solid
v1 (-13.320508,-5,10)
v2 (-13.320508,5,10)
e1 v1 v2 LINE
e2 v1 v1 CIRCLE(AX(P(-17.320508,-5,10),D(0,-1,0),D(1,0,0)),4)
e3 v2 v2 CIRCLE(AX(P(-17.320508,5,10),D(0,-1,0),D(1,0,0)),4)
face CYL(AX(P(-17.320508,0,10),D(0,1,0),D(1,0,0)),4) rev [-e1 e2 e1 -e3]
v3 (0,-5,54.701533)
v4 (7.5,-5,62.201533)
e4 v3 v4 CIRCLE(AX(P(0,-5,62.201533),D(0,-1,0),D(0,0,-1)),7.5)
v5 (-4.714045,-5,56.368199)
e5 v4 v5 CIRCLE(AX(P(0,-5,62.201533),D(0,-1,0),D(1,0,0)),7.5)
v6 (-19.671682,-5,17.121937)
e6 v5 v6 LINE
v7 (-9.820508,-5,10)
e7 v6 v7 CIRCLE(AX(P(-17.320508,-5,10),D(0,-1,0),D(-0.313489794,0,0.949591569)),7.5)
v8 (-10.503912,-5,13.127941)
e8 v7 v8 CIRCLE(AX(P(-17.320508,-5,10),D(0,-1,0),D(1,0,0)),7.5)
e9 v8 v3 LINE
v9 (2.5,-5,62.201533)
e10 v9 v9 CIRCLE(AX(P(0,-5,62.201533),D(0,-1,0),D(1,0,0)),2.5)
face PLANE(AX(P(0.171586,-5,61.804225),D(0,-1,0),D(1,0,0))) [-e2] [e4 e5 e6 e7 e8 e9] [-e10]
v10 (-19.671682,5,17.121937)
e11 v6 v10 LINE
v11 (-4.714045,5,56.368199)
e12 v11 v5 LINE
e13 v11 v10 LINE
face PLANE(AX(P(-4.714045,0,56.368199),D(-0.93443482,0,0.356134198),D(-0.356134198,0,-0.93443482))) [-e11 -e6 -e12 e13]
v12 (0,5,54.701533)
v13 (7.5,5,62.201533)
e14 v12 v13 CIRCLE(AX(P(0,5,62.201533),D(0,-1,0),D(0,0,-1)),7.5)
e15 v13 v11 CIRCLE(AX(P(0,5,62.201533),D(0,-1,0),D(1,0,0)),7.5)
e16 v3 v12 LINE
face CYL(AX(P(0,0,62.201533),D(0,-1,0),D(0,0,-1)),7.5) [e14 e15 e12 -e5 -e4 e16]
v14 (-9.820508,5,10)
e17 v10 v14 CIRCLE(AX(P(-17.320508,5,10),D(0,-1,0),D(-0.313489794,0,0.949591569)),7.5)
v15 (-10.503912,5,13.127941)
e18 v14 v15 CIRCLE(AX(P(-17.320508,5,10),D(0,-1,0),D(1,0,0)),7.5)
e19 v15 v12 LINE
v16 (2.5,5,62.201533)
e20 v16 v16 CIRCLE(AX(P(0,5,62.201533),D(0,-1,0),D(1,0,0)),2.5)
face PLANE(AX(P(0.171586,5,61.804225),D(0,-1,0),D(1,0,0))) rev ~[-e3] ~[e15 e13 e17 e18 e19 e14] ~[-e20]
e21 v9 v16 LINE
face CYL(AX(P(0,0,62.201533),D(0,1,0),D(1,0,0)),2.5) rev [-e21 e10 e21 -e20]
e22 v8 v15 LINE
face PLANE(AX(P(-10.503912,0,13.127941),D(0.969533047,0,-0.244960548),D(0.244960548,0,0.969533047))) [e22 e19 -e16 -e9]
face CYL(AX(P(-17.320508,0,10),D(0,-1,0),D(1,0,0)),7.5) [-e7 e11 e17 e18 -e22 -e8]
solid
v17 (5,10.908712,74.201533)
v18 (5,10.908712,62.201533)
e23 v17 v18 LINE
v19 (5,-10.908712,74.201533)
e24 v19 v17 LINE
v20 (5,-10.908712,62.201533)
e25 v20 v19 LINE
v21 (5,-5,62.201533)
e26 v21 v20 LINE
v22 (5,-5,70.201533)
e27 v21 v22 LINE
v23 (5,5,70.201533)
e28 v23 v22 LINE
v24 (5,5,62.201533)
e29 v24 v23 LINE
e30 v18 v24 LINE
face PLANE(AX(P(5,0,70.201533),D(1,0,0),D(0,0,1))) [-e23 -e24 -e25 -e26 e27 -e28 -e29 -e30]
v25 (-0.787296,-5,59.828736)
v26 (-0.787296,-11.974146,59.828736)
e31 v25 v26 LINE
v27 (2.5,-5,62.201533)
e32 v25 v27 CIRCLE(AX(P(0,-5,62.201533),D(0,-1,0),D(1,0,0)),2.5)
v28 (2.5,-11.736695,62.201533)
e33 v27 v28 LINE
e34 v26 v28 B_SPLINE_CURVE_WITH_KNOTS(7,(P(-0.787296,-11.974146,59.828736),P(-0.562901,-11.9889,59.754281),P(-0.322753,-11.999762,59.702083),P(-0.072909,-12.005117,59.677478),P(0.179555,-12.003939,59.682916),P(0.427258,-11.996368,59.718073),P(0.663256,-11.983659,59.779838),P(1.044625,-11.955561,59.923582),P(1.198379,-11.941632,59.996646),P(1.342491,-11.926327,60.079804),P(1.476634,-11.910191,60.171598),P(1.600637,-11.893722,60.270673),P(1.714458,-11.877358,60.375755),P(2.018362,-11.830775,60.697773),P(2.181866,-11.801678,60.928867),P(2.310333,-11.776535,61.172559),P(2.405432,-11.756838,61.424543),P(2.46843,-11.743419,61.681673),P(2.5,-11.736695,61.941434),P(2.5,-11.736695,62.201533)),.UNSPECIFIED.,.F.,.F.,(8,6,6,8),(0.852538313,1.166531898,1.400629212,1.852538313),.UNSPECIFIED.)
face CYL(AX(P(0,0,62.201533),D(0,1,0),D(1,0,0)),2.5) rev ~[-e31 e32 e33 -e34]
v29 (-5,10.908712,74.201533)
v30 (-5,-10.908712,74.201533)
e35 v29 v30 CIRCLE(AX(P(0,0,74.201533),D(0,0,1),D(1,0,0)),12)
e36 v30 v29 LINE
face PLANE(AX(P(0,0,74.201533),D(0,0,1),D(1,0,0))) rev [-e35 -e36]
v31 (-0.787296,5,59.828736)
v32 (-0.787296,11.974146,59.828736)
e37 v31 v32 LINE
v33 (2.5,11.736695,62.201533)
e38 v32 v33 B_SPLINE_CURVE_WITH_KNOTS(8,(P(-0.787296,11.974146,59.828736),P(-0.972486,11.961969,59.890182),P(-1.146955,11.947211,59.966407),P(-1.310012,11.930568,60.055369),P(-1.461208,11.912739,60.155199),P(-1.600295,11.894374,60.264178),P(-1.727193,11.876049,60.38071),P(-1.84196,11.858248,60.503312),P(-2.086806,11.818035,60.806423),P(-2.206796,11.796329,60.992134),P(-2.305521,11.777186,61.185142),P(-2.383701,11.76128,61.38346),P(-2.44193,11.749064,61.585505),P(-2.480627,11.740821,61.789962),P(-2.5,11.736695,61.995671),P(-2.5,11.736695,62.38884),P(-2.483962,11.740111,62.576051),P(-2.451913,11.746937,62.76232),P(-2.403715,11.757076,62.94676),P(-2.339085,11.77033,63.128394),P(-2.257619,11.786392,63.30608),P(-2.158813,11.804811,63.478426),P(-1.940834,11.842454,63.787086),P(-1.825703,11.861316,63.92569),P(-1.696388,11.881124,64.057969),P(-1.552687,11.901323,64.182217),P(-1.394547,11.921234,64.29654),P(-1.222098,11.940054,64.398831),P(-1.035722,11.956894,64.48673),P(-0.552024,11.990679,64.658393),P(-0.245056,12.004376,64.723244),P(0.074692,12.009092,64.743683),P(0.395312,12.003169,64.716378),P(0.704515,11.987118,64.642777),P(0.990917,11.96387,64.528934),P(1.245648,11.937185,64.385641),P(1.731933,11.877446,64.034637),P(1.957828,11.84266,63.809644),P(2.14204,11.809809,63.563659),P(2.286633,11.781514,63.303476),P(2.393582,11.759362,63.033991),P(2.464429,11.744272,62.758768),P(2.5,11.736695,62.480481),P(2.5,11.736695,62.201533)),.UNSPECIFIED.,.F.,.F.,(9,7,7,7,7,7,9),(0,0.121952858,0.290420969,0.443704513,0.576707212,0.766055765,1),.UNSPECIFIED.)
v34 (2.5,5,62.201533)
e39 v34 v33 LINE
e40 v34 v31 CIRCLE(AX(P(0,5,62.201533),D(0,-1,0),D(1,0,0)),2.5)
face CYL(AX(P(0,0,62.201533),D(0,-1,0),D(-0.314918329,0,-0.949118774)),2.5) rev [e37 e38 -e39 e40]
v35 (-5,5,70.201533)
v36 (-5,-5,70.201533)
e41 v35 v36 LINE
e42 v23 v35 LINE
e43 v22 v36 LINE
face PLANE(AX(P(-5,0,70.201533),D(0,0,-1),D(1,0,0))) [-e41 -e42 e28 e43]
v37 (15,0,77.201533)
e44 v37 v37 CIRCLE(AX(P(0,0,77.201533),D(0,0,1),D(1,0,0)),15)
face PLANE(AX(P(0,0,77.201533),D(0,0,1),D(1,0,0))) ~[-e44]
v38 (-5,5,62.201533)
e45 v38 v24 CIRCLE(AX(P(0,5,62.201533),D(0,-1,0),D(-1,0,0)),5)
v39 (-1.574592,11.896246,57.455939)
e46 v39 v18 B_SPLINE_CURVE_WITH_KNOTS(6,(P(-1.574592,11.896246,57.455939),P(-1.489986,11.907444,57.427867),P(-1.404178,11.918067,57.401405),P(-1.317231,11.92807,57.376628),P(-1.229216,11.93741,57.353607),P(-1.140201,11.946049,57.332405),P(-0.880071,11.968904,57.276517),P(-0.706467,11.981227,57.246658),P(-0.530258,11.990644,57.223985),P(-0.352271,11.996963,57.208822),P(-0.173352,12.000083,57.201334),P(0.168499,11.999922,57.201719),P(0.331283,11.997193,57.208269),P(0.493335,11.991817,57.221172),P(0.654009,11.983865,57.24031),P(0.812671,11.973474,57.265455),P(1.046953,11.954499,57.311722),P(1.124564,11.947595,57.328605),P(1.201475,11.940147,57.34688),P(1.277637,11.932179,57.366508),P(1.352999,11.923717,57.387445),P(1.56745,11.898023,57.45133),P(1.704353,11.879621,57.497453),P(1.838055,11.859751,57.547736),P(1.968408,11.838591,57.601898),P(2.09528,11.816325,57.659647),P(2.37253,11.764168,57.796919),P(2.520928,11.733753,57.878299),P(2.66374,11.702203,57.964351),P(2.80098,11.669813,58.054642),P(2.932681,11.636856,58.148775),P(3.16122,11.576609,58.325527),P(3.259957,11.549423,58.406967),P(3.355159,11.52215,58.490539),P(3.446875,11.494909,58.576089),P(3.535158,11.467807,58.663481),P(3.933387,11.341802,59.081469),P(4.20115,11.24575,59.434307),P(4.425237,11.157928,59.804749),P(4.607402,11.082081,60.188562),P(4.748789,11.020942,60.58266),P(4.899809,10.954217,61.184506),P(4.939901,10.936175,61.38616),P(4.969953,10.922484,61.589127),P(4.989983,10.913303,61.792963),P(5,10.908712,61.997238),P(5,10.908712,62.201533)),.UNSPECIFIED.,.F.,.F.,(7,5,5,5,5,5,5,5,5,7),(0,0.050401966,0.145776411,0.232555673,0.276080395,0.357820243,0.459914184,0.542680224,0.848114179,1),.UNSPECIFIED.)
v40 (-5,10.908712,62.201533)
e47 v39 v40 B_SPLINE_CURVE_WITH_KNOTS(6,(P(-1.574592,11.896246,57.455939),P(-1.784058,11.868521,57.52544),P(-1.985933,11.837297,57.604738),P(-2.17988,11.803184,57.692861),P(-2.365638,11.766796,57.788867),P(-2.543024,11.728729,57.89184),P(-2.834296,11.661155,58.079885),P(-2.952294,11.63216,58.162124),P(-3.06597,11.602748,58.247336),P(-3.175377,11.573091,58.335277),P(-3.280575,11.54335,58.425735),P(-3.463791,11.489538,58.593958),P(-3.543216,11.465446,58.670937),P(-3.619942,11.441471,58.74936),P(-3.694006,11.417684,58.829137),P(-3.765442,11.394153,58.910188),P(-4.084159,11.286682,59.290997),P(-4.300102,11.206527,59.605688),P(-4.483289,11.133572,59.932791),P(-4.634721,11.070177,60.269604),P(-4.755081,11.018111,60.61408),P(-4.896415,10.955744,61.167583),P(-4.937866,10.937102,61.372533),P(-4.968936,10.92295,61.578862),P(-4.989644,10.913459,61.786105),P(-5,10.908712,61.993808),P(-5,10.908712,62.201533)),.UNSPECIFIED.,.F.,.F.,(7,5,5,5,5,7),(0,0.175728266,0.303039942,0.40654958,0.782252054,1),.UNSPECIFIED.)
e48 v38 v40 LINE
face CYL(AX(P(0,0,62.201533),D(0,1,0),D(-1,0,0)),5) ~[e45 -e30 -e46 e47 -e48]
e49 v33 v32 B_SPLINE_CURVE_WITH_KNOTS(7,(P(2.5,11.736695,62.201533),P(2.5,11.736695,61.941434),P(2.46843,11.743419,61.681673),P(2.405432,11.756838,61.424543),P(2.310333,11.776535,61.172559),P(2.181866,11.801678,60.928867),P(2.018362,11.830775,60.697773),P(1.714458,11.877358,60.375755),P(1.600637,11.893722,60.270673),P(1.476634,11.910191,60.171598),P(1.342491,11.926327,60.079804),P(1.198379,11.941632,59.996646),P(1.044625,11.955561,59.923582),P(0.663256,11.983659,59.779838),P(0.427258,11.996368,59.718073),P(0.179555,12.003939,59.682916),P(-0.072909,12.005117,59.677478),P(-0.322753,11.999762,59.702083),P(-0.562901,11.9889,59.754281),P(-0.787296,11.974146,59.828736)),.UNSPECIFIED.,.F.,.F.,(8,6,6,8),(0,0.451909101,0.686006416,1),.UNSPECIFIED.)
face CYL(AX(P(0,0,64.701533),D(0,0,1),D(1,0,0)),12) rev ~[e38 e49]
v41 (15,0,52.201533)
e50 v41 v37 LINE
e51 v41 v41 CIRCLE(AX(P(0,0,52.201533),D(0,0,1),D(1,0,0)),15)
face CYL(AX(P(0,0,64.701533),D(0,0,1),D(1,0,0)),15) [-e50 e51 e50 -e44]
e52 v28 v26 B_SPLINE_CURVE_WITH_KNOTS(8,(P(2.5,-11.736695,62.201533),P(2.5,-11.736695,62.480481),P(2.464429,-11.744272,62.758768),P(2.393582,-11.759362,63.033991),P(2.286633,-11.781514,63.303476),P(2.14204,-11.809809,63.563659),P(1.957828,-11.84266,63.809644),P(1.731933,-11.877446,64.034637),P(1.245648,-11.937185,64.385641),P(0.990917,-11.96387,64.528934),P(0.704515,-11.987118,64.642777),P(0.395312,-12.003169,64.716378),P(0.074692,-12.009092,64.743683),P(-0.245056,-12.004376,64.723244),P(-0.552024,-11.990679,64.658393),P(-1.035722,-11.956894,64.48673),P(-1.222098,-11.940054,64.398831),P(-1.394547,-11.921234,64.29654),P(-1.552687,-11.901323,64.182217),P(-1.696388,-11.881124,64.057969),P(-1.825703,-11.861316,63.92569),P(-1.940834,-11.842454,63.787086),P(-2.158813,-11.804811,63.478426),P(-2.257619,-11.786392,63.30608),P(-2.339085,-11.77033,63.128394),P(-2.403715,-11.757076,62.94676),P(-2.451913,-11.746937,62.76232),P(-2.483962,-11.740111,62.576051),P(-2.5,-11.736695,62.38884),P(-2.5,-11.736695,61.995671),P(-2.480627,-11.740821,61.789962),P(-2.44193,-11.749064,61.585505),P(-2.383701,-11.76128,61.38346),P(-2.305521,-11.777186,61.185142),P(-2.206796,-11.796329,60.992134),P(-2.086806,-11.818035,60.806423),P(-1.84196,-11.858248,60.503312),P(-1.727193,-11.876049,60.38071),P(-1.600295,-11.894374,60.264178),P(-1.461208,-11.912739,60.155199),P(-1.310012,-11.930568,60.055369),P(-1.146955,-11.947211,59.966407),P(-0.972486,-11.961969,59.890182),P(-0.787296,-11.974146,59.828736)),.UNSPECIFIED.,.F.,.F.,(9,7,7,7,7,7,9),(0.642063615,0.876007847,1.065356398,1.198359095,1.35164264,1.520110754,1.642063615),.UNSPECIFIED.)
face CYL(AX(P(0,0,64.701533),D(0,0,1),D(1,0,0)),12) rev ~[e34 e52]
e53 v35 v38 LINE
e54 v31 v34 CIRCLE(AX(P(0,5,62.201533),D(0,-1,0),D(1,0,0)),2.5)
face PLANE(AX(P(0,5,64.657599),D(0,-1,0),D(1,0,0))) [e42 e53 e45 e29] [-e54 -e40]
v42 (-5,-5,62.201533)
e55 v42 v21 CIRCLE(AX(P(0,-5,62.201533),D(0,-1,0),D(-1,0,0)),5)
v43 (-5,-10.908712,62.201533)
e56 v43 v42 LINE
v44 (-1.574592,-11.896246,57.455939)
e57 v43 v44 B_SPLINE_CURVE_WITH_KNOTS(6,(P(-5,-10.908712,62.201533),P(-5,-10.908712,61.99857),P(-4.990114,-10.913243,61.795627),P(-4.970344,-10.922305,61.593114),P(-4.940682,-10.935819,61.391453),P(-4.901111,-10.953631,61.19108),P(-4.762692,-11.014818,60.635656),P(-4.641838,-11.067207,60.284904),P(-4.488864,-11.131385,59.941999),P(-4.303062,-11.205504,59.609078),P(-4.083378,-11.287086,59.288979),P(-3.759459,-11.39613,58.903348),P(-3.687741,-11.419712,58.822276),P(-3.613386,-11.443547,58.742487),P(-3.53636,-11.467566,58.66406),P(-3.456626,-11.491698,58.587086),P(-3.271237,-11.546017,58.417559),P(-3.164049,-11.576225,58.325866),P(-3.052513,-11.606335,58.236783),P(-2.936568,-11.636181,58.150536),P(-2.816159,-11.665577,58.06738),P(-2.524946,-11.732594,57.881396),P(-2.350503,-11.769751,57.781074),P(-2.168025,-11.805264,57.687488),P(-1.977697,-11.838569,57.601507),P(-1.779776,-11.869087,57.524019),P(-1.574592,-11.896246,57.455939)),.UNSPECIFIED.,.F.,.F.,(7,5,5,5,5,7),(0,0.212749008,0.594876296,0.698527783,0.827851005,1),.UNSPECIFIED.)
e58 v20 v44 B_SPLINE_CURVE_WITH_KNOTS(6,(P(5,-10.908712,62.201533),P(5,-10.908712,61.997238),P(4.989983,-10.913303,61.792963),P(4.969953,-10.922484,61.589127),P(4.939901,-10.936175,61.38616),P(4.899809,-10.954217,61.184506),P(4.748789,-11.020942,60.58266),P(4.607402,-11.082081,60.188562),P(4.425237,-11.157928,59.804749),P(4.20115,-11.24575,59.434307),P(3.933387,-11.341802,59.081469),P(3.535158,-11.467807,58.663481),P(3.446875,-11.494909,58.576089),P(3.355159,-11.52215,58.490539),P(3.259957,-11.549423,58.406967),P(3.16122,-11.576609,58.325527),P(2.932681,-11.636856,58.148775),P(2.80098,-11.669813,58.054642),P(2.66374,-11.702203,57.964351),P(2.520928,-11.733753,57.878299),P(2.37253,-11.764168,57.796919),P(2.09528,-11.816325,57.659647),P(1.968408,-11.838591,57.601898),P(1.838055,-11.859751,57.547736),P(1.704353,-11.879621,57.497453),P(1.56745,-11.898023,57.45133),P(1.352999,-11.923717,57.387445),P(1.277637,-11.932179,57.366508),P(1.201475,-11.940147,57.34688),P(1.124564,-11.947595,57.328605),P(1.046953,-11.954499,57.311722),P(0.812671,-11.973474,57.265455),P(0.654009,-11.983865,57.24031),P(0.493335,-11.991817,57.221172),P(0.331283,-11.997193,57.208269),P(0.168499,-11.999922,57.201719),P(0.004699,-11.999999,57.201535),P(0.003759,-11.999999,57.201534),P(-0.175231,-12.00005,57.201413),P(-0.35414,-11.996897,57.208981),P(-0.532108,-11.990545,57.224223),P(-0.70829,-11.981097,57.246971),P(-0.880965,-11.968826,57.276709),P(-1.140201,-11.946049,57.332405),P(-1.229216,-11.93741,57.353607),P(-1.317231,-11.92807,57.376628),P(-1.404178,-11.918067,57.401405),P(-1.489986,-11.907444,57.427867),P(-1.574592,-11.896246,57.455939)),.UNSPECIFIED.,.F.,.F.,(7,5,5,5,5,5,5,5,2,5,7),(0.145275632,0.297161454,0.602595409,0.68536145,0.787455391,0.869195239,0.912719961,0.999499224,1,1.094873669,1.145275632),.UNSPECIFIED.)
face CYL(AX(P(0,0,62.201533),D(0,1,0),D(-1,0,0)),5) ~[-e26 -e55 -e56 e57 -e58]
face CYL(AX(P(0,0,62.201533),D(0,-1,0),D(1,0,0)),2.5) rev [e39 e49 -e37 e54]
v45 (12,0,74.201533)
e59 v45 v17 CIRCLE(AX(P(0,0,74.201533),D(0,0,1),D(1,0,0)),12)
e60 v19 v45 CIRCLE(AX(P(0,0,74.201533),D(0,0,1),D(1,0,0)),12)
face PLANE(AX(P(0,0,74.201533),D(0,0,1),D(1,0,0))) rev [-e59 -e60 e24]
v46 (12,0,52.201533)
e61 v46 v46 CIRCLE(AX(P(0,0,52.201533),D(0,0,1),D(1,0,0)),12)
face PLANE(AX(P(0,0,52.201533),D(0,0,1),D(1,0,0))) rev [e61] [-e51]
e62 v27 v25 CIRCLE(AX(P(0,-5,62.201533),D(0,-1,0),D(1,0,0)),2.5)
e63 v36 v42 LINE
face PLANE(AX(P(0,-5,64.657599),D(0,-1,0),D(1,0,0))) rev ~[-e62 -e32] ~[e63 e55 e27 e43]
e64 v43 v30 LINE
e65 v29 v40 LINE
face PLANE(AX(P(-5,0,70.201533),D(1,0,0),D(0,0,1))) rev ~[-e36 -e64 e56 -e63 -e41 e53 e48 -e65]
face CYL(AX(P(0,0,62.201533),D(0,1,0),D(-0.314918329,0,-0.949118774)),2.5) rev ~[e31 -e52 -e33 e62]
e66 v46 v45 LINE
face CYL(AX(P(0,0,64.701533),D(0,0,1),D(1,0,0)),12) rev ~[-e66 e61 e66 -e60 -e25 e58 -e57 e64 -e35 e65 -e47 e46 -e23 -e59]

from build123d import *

# Parameters (mm, degrees)
F1_W          = 15
F1_H          = 25
F3_T          = -3
F4_DEPTH      = 12.0000001006
F4_DEPTH_BACK = 12.0000001006
F5_R          = 2.5
F6_DEPTH      = 5
F7_W          = 10
F7_H          = 7
F8_DEPTH      = 12
F8_DEPTH_BACK = 12
F9_R          = 2.5
F9_R_2        = 4
F10_DEPTH     = 5


with BuildPart() as f2:
    # F1 (on Front) → F2 (revolve)
    with BuildSketch(Plane.XZ):
        with Locations((7.5, 64.7015325446)):
            Rectangle(F1_W, F1_H)
    revolve(axis=Axis((0, 0, 62.2015325446), (0, 0, 1)))

    # F3
    f3_openings = [f2.faces().sort_by_distance(p)[0] for p in [
        (0, 0, 52.201533),
    ]]
    offset(amount=F3_T, openings=f3_openings)

    # F0 (on Front) → F4 (join, two sides)
    with BuildSketch(Plane.XZ) as f4_sk:
        with BuildLine():
            ThreePointArc((-5, 62.2015325446), (-4.0541927813, 59.2751831307), (-1.5745916432, 57.4559386769))
            ThreePointArc((-1.5745916432, 57.4559386769), (2.9263494138, 58.1473397632), (5, 62.2015325446))
            Line((5, 62.2015325446), (5, 70.2015325446))
            Line((5, 70.2015325446), (-5, 70.2015325446))
            Line((-5, 70.2015325446), (-5, 62.2015325446))
        make_face()
        with BuildLine():
            ThreePointArc((2.5, 62.2015325446), (1.4631747069, 60.1744361539), (-0.7872958216, 59.8287356107))
            ThreePointArc((-0.7872958216, 59.8287356107), (-1.4631747069, 64.2286289352), (2.5, 62.2015325446))
        make_face(mode=Mode.SUBTRACT)
    extrude(amount=-F4_DEPTH)
    extrude(f4_sk.sketch, amount=F4_DEPTH_BACK)

    # F5 (on Front) → F6 (cut, symmetric)
    with BuildSketch(Plane.XZ):
        with BuildLine():
            Line((5, 70.2015325446), (-5, 70.2015325446))
            Line((-5, 70.2015325446), (-5, 62.2015325446))
            ThreePointArc((-5, 62.2015325446), (0, 57.2015325446), (5, 62.2015325446))
            Line((5, 62.2015325446), (5, 70.2015325446))
        make_face()
        with Locations((0, 62.2015325446)):
            Circle(F5_R, mode=Mode.SUBTRACT)
    extrude(amount=F6_DEPTH, both=True, mode=Mode.SUBTRACT)

    # F7 (on Front) → F8 (join, two sides)
    with BuildSketch(Plane.XZ) as f8_sk:
        with Locations((0, 73.7015325446)):
            Rectangle(F7_W, F7_H)
    extrude(amount=F8_DEPTH)
    extrude(f8_sk.sketch, amount=-F8_DEPTH_BACK)


with BuildPart() as f10:
    # F9 (on Front) → F10 (new body, symmetric)
    with BuildSketch(Plane.XZ):
        with BuildLine():
            ThreePointArc((0, 54.7015325446), (5.3033008589, 56.8982316857), (7.5, 62.2015325446))
            ThreePointArc((7.5, 62.2015325446), (-3.232233047, 68.9692994975), (-4.7140452079, 56.3681992112))
            ThreePointArc((-4.7140452079, 56.3681992112), (-2.5, 55.1304647327), (0, 54.7015325446))
        make_face()
        with Locations((0, 62.2015325446)):
            Circle(F9_R, mode=Mode.SUBTRACT)
        with BuildLine():
            ThreePointArc((0, 54.7015325446), (-2.5, 55.1304647327), (-4.7140452079, 56.3681992112))
            Line((-4.7140452079, 56.3681992112), (-19.6716815341, 17.1219367709))
            ThreePointArc((-19.6716815341, 17.1219367709), (-14.325011455, 16.8758272226), (-10.5039119039, 13.1279412767))
            Line((-10.5039119039, 13.1279412767), (0, 54.7015325446))
        make_face()
        with BuildLine():
            ThreePointArc((-10.5039119039, 13.1279412767), (-14.325011455, 16.8758272226), (-19.6716815341, 17.1219367709))
            ThreePointArc((-19.6716815341, 17.1219367709), (-21.7146063371, 3.922015098), (-9.8205080757, 10))
            ThreePointArc((-9.8205080757, 10), (-9.9933506702, 11.6008636281), (-10.5039119039, 13.1279412767))
        make_face()
        with Locations((-17.3205080757, 10)):
            Circle(F9_R_2, mode=Mode.SUBTRACT)
    extrude(amount=F10_DEPTH, both=True)


solid = Compound([f2.part, f10.part])
